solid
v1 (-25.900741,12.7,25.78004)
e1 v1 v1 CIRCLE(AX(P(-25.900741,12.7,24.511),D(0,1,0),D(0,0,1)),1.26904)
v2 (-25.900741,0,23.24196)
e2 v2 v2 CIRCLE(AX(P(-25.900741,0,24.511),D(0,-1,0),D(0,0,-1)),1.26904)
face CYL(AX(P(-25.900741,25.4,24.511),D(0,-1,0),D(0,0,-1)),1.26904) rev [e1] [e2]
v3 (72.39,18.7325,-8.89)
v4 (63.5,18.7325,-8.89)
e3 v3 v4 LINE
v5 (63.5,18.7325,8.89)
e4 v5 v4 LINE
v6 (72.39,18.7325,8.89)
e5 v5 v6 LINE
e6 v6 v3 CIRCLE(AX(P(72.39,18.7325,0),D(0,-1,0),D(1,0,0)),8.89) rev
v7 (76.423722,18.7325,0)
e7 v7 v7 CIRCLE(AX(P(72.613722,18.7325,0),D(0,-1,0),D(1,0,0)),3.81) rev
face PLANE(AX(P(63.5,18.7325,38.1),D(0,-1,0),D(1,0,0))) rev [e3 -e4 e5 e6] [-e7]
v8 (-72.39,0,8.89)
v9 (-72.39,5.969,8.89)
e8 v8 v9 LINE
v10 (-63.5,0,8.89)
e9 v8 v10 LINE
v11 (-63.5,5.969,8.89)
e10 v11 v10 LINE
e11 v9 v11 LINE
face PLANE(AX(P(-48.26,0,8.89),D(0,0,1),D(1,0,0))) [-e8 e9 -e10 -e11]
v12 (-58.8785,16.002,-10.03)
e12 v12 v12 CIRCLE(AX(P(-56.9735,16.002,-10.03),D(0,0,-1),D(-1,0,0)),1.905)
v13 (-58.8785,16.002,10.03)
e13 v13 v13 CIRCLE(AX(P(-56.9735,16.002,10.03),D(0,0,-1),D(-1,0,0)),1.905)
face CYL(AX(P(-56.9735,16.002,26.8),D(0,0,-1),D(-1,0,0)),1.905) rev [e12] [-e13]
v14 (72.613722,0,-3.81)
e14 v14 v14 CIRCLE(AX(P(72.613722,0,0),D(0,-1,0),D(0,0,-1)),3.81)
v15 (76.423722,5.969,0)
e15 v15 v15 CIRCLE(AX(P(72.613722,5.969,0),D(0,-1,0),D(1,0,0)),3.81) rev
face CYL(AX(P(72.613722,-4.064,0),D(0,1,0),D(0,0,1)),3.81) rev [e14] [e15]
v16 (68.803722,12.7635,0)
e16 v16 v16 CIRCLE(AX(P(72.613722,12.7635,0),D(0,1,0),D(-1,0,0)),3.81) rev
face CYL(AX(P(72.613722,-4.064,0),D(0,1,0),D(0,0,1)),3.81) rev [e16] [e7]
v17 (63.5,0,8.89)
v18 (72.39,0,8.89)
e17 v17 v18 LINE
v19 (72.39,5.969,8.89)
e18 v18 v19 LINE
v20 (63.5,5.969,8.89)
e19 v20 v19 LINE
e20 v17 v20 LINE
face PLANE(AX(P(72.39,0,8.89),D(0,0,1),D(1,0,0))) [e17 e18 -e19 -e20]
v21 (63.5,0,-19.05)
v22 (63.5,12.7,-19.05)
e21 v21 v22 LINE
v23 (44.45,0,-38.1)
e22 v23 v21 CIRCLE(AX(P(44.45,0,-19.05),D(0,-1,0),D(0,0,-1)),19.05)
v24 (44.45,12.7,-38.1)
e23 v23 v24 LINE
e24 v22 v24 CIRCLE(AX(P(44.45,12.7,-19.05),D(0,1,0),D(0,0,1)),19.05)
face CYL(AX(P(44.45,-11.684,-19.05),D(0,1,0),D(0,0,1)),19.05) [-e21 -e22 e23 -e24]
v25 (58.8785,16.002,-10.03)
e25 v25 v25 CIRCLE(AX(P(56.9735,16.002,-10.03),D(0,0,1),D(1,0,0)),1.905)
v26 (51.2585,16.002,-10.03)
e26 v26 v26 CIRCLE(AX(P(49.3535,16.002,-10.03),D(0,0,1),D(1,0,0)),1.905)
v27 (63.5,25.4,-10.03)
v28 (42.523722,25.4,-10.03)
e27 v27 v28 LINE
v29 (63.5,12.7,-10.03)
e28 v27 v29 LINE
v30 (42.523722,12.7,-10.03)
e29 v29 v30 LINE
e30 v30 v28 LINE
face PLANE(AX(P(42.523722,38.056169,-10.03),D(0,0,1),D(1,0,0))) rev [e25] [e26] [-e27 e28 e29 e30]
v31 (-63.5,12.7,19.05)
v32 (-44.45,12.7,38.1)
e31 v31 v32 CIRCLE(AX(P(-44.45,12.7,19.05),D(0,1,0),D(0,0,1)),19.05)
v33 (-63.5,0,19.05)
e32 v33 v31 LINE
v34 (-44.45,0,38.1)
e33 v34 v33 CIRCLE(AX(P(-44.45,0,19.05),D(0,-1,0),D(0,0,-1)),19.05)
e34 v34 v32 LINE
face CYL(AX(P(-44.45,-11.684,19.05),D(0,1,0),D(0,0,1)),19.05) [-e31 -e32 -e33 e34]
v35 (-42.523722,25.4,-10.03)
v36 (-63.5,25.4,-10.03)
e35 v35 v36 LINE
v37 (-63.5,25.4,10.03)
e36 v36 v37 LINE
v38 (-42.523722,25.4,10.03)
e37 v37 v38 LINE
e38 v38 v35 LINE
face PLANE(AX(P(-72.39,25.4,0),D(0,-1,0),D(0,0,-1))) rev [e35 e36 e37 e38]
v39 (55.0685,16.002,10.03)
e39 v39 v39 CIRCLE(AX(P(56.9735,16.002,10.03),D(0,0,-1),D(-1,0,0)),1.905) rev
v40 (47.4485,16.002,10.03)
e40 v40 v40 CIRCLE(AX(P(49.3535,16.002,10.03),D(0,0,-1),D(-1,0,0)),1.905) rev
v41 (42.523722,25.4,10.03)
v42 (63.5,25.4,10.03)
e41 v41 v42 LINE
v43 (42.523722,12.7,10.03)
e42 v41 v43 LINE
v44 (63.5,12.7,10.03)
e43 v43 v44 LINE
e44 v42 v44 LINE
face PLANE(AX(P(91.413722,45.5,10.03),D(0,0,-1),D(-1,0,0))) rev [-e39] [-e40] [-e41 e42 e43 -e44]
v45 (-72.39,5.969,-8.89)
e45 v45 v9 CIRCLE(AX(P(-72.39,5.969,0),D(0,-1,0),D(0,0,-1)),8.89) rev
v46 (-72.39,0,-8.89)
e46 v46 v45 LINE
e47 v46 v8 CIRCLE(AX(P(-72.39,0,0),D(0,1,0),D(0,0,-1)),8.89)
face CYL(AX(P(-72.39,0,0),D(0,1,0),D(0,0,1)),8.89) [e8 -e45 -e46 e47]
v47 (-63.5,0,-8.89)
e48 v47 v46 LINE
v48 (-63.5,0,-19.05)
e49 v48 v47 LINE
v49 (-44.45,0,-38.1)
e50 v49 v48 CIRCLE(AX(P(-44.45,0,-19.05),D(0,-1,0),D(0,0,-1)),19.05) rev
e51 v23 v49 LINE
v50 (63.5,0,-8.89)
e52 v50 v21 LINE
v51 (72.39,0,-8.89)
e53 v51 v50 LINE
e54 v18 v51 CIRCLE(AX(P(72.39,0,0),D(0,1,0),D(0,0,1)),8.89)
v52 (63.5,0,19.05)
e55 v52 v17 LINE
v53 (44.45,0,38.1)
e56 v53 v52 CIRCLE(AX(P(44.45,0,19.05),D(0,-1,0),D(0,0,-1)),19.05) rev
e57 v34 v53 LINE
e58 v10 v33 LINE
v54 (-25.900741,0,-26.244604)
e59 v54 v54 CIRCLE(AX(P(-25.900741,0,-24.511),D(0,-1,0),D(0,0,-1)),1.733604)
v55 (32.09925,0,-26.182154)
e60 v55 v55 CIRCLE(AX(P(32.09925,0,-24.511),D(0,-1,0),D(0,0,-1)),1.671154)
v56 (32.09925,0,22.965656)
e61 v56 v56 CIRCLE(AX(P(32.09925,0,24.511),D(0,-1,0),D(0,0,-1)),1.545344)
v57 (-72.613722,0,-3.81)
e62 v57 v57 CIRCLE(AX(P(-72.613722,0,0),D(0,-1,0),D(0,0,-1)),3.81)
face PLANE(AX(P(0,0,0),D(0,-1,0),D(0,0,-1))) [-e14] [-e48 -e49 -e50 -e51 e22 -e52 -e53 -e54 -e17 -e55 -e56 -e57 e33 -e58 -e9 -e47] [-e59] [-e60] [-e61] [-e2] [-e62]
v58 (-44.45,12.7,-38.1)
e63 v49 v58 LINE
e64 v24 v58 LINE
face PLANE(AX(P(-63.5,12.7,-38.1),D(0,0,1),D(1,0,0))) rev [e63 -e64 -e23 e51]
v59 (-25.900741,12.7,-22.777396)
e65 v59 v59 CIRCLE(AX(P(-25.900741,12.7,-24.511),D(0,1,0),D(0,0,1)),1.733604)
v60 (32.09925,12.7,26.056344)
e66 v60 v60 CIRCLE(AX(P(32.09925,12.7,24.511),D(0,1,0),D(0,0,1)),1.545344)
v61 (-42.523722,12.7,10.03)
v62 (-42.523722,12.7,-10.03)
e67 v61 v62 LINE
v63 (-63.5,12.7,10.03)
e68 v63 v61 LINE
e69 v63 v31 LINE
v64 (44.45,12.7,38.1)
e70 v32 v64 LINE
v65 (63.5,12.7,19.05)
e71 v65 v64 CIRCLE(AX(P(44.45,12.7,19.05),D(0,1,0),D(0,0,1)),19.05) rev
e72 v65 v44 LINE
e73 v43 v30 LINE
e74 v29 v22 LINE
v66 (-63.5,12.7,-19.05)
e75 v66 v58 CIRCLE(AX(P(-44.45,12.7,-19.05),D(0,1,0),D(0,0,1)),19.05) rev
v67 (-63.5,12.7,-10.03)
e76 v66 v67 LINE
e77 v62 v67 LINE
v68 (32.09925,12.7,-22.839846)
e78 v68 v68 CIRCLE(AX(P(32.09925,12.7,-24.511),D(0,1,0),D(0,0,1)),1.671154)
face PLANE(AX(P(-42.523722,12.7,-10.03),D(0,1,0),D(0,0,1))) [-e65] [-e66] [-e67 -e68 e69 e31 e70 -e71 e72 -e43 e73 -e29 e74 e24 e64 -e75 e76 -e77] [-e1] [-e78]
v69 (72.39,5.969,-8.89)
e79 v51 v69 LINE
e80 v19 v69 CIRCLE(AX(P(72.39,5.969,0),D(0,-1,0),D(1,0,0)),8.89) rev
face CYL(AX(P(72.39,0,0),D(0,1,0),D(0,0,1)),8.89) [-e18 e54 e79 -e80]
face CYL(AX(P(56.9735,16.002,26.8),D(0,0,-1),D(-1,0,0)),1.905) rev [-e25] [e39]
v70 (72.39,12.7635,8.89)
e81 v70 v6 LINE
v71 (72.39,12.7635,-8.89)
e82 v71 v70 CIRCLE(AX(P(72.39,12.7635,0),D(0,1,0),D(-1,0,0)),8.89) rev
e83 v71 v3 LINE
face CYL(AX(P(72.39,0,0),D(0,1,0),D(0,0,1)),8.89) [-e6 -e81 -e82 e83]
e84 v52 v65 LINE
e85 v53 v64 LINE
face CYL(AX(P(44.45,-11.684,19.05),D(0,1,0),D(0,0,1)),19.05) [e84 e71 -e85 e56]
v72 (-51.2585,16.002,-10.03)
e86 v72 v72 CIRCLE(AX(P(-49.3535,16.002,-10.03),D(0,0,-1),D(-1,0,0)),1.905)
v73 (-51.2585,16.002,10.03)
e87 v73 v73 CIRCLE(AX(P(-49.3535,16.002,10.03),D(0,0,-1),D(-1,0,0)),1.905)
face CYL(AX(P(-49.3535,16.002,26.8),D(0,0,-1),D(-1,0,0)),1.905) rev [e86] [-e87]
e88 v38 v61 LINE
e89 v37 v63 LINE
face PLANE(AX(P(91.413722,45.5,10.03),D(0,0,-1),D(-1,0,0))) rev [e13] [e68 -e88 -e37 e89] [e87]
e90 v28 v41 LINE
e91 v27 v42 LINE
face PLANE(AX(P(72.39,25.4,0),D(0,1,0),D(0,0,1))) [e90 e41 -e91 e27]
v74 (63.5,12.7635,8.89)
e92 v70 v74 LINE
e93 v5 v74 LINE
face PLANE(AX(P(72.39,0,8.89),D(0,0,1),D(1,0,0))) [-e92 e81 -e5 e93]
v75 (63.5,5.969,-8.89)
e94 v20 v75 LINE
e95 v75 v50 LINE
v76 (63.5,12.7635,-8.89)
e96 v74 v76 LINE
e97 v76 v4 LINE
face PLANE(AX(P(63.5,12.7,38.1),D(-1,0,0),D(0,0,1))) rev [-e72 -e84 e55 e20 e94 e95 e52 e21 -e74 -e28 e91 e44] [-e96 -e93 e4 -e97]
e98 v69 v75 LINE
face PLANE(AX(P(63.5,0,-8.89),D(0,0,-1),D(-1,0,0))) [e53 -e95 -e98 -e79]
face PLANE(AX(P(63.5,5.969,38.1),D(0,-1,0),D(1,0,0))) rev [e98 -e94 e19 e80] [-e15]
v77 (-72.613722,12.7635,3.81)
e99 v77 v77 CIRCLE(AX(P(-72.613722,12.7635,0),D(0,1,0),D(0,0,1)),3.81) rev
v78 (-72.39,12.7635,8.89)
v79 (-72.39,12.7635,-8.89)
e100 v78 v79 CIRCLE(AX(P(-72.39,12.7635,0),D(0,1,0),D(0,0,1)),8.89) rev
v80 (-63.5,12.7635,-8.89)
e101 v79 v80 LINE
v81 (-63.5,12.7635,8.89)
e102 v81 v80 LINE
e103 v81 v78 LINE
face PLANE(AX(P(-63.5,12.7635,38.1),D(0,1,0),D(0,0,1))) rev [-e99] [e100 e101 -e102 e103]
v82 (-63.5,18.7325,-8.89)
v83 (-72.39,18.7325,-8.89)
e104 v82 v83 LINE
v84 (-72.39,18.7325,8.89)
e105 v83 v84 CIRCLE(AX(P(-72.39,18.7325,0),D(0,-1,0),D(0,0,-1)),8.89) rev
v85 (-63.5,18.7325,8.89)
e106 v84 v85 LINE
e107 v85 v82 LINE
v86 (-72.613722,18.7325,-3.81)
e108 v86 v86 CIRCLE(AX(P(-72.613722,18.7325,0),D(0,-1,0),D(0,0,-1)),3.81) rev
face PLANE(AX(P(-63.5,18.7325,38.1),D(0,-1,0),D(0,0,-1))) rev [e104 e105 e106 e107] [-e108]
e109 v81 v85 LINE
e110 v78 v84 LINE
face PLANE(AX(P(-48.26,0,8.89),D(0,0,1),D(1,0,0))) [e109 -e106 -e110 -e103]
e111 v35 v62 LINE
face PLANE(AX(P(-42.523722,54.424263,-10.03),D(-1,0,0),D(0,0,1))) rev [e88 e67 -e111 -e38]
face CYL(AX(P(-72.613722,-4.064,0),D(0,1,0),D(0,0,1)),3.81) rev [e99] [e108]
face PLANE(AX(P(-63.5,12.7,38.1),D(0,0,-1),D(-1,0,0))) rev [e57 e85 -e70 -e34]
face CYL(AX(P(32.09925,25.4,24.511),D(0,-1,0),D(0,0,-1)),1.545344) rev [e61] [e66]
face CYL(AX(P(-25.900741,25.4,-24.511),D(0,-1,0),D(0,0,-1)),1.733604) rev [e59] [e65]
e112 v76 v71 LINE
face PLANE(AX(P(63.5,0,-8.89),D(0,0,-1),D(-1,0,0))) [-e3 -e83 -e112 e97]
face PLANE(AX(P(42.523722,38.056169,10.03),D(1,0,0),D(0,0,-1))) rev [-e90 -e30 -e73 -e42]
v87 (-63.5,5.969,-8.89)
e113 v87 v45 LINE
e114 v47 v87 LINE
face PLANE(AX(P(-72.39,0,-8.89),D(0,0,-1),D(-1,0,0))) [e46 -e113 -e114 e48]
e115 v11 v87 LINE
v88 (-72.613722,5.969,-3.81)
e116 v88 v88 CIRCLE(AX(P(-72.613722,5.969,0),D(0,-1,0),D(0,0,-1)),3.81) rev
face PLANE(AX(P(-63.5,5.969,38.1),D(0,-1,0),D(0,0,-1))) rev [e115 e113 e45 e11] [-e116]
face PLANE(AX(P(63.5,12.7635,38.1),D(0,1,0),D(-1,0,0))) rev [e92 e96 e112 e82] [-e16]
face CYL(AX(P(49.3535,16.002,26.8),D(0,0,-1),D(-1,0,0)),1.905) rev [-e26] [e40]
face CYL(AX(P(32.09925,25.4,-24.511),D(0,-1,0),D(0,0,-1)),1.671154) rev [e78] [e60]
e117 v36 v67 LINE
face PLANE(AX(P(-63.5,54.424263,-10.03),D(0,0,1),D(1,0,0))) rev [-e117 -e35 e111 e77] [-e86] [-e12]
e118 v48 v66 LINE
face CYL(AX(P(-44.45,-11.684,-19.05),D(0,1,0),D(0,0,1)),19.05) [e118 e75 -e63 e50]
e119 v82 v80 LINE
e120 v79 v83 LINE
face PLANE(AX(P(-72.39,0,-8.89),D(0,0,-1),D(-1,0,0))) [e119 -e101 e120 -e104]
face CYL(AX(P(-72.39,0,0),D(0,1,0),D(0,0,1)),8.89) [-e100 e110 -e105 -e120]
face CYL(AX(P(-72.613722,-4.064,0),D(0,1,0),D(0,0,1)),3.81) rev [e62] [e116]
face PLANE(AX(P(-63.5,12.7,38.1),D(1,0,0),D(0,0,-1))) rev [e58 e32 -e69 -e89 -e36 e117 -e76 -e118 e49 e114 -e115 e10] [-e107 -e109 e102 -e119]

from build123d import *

# Parameters (mm, degrees)
SKETCH1_W                 = 127
SKETCH1_H                 = 76.2
BOSS_EXTRUDE1_DEPTH       = 12.7
BOSS_EXTRUDE2_DEPTH       = 12.7
BOSS_EXTRUDE2_DEPTH_BACK  = 12.7
SKETCH3_R                 = 3.81
CUT_EXTRUDE1_DEPTH        = 29.464
SKETCH4_W                 = 17.78
SKETCH4_H                 = 6.604
CUT_EXTRUDE2_DEPTH        = 29.464
BOSS_EXTRUDE3_START       = -12.7
BOSS_EXTRUDE3_OUTLINE_W   = 57.78
BOSS_EXTRUDE3_OUTLINE_H   = 32.76
BOSS_EXTRUDE3_OUTLINE_W_2 = 40
BOSS_EXTRUDE3_OUTLINE_H_2 = 20.06
BOSS_EXTRUDE3_DEPTH       = 45.5
CUT_EXTRUDE5_DEPTH        = 44.196
SKETCH10_W                = 20.976278311
SKETCH10_H                = 20.06
BOSS_EXTRUDE5_DEPTH       = 12.7
CUT_EXTRUDE7_DEPTH        = 187.177258339
CUT_EXTRUDE7_DEPTH_BACK   = 76.2
SKETCH11_W                = 20.06
SKETCH11_H                = 7.443830751
SPLIT1_START              = 12.7
SPLIT1_OUTLINE_W          = 57.78
SPLIT1_OUTLINE_H          = 32.76
SPLIT1_OUTLINE_W_2        = 40
SPLIT1_OUTLINE_H_2        = 20.06
SPLIT1_DEPTH              = 45.5
CUT_EXTRUDE9_DEPTH        = 24.384
SKETCH13_R                = 1.905
CUT_EXTRUDE10_DEPTH       = 36.83
SKETCH14_W                = 17.78
SKETCH14_H                = 0.127
CUT_EXTRUDE11_DEPTH       = 98.260775753
SKETCH15_W                = 17.78
SKETCH15_H                = 0.0635
CUT_EXTRUDE12_DEPTH       = 98.260775753
SKETCH16_W                = 17.78
SKETCH16_H                = 0.0635
CUT_EXTRUDE13_DEPTH       = 98.260775753
SKETCH17_W                = 17.78
SKETCH17_H                = 0.127
CUT_EXTRUDE14_DEPTH       = 98.260775753
SKETCH18_W                = 17.78
SKETCH18_H                = 0.0635
CUT_EXTRUDE15_DEPTH       = 98.260775753
SKETCH19_R                = 1.671154259
SKETCH19_R_2              = 1.733603543
SKETCH19_R_3              = 1.269040072
SKETCH19_R_4              = 1.545344409
CUT_EXTRUDE16_DEPTH       = 94.290987775


# Read off the part's stored shape, not the designer's step: Boss-Extrude3, Split1
with BuildPart() as part:
    # Sketch1 → Boss-Extrude1 (new body)
    with BuildSketch(Plane(origin=(0, 0, 0), x_dir=(1, 0, 0), z_dir=(0, 1, 0))):
        Rectangle(SKETCH1_W, SKETCH1_H)
    extrude(amount=BOSS_EXTRUDE1_DEPTH)

    # Sketch2 → Boss-Extrude2 (add, two sides: drawn at the far end of the back side and taken through both)
    with BuildSketch(Plane(origin=(0, 12.7, 0), x_dir=(1, 0, 0), z_dir=(0, 1, 0)).offset(-BOSS_EXTRUDE2_DEPTH_BACK)):
        with BuildLine():
            Line((72.39, 8.89), (63.5, 8.89))
            Line((63.5, 8.89), (48.26, 8.89))
            Line((48.26, 8.89), (48.26, -8.89))
            Line((48.26, -8.89), (63.5, -8.89))
            Line((63.5, -8.89), (72.39, -8.89))
            ThreePointArc((72.39, -8.89), (81.28, 0), (72.39, 8.89))
        make_face()
        with BuildLine():
            Line((-48.26, -8.89), (-63.5, -8.89))
            Line((-63.5, -8.89), (-72.39, -8.89))
            ThreePointArc((-72.39, -8.89), (-81.28, 0), (-72.39, 8.89))
            Line((-72.39, 8.89), (-63.5, 8.89))
            Line((-63.5, 8.89), (-48.26, 8.89))
            Line((-48.26, 8.89), (-48.26, -8.89))
        make_face()
    extrude(amount=BOSS_EXTRUDE2_DEPTH + BOSS_EXTRUDE2_DEPTH_BACK)

    # Sketch3 → Cut-Extrude1 (cut)
    with BuildSketch(Plane(origin=(0, 25.4, 0), x_dir=(1, 0, 0), z_dir=(0, 1, 0))):
        with Locations(Location((72.613721689, 0, 0), (0, 0, 270))):
            Circle(SKETCH3_R)
        with Locations(Location((-72.613721689, 0, 0), (0, 0, 90))):
            Circle(SKETCH3_R)
    extrude(amount=-CUT_EXTRUDE1_DEPTH, mode=Mode.SUBTRACT)

    # Sketch4 → Cut-Extrude2 (cut)
    with BuildSketch(Plane.XY.offset(8.89)):
        with Locations((72.39, 22.098)):
            Rectangle(SKETCH4_W, SKETCH4_H)
        with Locations((72.39, 9.398)):
            Rectangle(SKETCH4_W, SKETCH4_H)
        with Locations((-72.39, 9.398)):
            Rectangle(SKETCH4_W, SKETCH4_H)
        with Locations((-72.39, 22.098)):
            Rectangle(SKETCH4_W, SKETCH4_H)
    extrude(amount=-CUT_EXTRUDE2_DEPTH, mode=Mode.SUBTRACT)



with BuildPart() as body_2:
    # Boss-Extrude3 outline → Boss-Extrude3 (new body)
    with BuildSketch(Plane(origin=(0, 25.4, 0), x_dir=(1, 0, 0), z_dir=(0, 1, 0)).offset(BOSS_EXTRUDE3_START)):
        with Locations((62.523721689, 0)):
            Rectangle(BOSS_EXTRUDE3_OUTLINE_W, BOSS_EXTRUDE3_OUTLINE_H)
        with Locations((62.523721689, 0)):
            Rectangle(BOSS_EXTRUDE3_OUTLINE_W_2, BOSS_EXTRUDE3_OUTLINE_H_2, mode=Mode.SUBTRACT)
    extrude(amount=BOSS_EXTRUDE3_DEPTH)

    # Sketch7 → Cut-Extrude5 (cut)
    with BuildSketch(Plane.XY.offset(16.38)):
        with BuildLine():
            Line((91.413721689, 45.5), (91.413721689, 12.7))
            Line((91.413721689, 12.7), (63.5, 12.7))
            add(Edge.make_bspline(
                [(91.413721689, 45.5), (71.582716482, 29.1), (63.5, 12.7)],
                knots=[0, 0, 0, 1, 1, 1], degree=2, weights=[1, 3, 1]))
        make_face()
    extrude(amount=-CUT_EXTRUDE5_DEPTH, mode=Mode.SUBTRACT)


with BuildPart() as part_1:
    add(part.part)

    add(body_2.part)  # Boss-Extrude5 merges body 2
    # Sketch10 → Boss-Extrude5 (add)
    with BuildSketch(Plane(origin=(0, 12.7, 0), x_dir=(1, 0, 0), z_dir=(0, 1, 0))):
        with Locations((53.011860845, 0)):
            Rectangle(SKETCH10_W, SKETCH10_H)
        with Locations((-53.011860845, 0)):
            Rectangle(SKETCH10_W, SKETCH10_H)
    extrude(amount=BOSS_EXTRUDE5_DEPTH)

    # Sketch11 → Cut-Extrude7 (cut, two sides: drawn at the far end of the back side and taken through both)
    with BuildSketch(Plane(origin=(91.413721689, 0, 0), x_dir=(0, 0, -1), z_dir=(1, 0, 0)).offset(-CUT_EXTRUDE7_DEPTH_BACK)):
        with Locations((0, 41.778084624)):
            Rectangle(SKETCH11_W, SKETCH11_H)
    extrude(amount=CUT_EXTRUDE7_DEPTH + CUT_EXTRUDE7_DEPTH_BACK, mode=Mode.SUBTRACT)

    # Split1 outline → Split1 (cut)
    with BuildSketch(Plane(origin=(0, 0, 0), x_dir=(1, 0, 0), z_dir=(0, 1, 0)).offset(SPLIT1_START)):
        with Locations((62.523721689, 0)):
            Rectangle(SPLIT1_OUTLINE_W, SPLIT1_OUTLINE_H)
        with Locations((62.523721689, 0)):
            Rectangle(SPLIT1_OUTLINE_W_2, SPLIT1_OUTLINE_H_2, mode=Mode.SUBTRACT)
    extrude(amount=SPLIT1_DEPTH, mode=Mode.SUBTRACT)

    # Sketch12 → Cut-Extrude9 (cut)
    with BuildSketch(Plane(origin=(0, 12.7, 0), x_dir=(1, 0, 0), z_dir=(0, 1, 0))):
        with BuildLine():
            Line((63.5, 38.1), (44.45, 38.1))
            ThreePointArc((44.45, 38.1), (57.920384182, 32.520384182), (63.5, 19.05))
            Line((63.5, 19.05), (63.5, 38.1))
        make_face()
        with BuildLine():
            Line((63.5, -38.1), (63.5, -19.05))
            ThreePointArc((63.5, -19.05), (57.920384182, -32.520384182), (44.45, -38.1))
            Line((44.45, -38.1), (63.5, -38.1))
        make_face()
        with BuildLine():
            Line((-63.5, -38.1), (-44.45, -38.1))
            ThreePointArc((-44.45, -38.1), (-57.920384182, -32.520384182), (-63.5, -19.05))
            Line((-63.5, -19.05), (-63.5, -38.1))
        make_face()
        with BuildLine():
            ThreePointArc((-63.5, 19.05), (-57.920384182, 32.520384182), (-44.45, 38.1))
            Line((-44.45, 38.1), (-63.5, 38.1))
            Line((-63.5, 38.1), (-63.5, 19.05))
        make_face()
    extrude(amount=-CUT_EXTRUDE9_DEPTH, mode=Mode.SUBTRACT)

    # Sketch13 → Cut-Extrude10 (cut)
    with BuildSketch(Plane(origin=(0, 0, -10.03), x_dir=(-1, 0, 0), z_dir=(0, 0, -1))):
        with Locations((56.9735, 16.002)):
            Circle(SKETCH13_R)
        with Locations((49.3535, 16.002)):
            Circle(SKETCH13_R)
    cut_extrude10 = extrude(amount=-CUT_EXTRUDE10_DEPTH, mode=Mode.SUBTRACT)

    # Mirror1: Cut-Extrude10 across plane
    add(cut_extrude10.mirror(Plane(origin=(0, 0, 0), x_dir=(0, 0, 1), z_dir=(1, 0, 0))), mode=Mode.SUBTRACT)

    # Sketch14 → Cut-Extrude11 (cut, through all)
    with BuildSketch(Plane(origin=(0, 0, -8.89), x_dir=(-1, 0, 0), z_dir=(0, 0, -1))):
        with Locations((72.39, 6.0325)):
            Rectangle(SKETCH14_W, SKETCH14_H)
    extrude(amount=-CUT_EXTRUDE11_DEPTH, mode=Mode.SUBTRACT)

    # Sketch15 → Cut-Extrude12 (cut, through all)
    with BuildSketch(Plane(origin=(0, 0, -8.89), x_dir=(-1, 0, 0), z_dir=(0, 0, -1))):
        with Locations((72.39, 18.76425)):
            Rectangle(SKETCH15_W, SKETCH15_H)
    extrude(amount=-CUT_EXTRUDE12_DEPTH, mode=Mode.SUBTRACT)

    # Sketch16 → Cut-Extrude13 (cut, through all)
    with BuildSketch(Plane(origin=(0, 0, -8.89), x_dir=(-1, 0, 0), z_dir=(0, 0, -1))):
        with Locations((72.39, 12.73175)):
            Rectangle(SKETCH16_W, SKETCH16_H)
    extrude(amount=-CUT_EXTRUDE13_DEPTH, mode=Mode.SUBTRACT)

    # Sketch17 → Cut-Extrude14 (cut, through all)
    with BuildSketch(Plane(origin=(0, 0, -8.89), x_dir=(-1, 0, 0), z_dir=(0, 0, -1))):
        with Locations((-72.39, 6.0325)):
            Rectangle(SKETCH17_W, SKETCH17_H)
    extrude(amount=-CUT_EXTRUDE14_DEPTH, mode=Mode.SUBTRACT)

    # Sketch18 → Cut-Extrude15 (cut, through all)
    with BuildSketch(Plane(origin=(0, 0, -8.89), x_dir=(-1, 0, 0), z_dir=(0, 0, -1))):
        with Locations((-72.39, 12.73175)):
            Rectangle(SKETCH18_W, SKETCH18_H)
        with Locations((-72.39, 18.76425)):
            Rectangle(SKETCH18_W, SKETCH18_H)
    extrude(amount=-CUT_EXTRUDE15_DEPTH, mode=Mode.SUBTRACT)

    # Sketch19 → Cut-Extrude16 (cut, through all)
    with BuildSketch(Plane(origin=(0, 0, 0), x_dir=(-1, 0, 0), z_dir=(0, -1, 0))):
        with Locations(Location((-32.09925, 24.511, 0), (0, 0, 90))):
            Circle(SKETCH19_R)
        with Locations(Location((25.90074068, 24.511, 0), (0, 0, 90))):
            Circle(SKETCH19_R_2)
        with Locations(Location((25.90074068, -24.511, 0), (0, 0, 90))):
            Circle(SKETCH19_R_3)
        with Locations(Location((-32.09925, -24.511, 0), (0, 0, 90))):
            Circle(SKETCH19_R_4)
    extrude(amount=-CUT_EXTRUDE16_DEPTH, mode=Mode.SUBTRACT)


solid = part_1.part
